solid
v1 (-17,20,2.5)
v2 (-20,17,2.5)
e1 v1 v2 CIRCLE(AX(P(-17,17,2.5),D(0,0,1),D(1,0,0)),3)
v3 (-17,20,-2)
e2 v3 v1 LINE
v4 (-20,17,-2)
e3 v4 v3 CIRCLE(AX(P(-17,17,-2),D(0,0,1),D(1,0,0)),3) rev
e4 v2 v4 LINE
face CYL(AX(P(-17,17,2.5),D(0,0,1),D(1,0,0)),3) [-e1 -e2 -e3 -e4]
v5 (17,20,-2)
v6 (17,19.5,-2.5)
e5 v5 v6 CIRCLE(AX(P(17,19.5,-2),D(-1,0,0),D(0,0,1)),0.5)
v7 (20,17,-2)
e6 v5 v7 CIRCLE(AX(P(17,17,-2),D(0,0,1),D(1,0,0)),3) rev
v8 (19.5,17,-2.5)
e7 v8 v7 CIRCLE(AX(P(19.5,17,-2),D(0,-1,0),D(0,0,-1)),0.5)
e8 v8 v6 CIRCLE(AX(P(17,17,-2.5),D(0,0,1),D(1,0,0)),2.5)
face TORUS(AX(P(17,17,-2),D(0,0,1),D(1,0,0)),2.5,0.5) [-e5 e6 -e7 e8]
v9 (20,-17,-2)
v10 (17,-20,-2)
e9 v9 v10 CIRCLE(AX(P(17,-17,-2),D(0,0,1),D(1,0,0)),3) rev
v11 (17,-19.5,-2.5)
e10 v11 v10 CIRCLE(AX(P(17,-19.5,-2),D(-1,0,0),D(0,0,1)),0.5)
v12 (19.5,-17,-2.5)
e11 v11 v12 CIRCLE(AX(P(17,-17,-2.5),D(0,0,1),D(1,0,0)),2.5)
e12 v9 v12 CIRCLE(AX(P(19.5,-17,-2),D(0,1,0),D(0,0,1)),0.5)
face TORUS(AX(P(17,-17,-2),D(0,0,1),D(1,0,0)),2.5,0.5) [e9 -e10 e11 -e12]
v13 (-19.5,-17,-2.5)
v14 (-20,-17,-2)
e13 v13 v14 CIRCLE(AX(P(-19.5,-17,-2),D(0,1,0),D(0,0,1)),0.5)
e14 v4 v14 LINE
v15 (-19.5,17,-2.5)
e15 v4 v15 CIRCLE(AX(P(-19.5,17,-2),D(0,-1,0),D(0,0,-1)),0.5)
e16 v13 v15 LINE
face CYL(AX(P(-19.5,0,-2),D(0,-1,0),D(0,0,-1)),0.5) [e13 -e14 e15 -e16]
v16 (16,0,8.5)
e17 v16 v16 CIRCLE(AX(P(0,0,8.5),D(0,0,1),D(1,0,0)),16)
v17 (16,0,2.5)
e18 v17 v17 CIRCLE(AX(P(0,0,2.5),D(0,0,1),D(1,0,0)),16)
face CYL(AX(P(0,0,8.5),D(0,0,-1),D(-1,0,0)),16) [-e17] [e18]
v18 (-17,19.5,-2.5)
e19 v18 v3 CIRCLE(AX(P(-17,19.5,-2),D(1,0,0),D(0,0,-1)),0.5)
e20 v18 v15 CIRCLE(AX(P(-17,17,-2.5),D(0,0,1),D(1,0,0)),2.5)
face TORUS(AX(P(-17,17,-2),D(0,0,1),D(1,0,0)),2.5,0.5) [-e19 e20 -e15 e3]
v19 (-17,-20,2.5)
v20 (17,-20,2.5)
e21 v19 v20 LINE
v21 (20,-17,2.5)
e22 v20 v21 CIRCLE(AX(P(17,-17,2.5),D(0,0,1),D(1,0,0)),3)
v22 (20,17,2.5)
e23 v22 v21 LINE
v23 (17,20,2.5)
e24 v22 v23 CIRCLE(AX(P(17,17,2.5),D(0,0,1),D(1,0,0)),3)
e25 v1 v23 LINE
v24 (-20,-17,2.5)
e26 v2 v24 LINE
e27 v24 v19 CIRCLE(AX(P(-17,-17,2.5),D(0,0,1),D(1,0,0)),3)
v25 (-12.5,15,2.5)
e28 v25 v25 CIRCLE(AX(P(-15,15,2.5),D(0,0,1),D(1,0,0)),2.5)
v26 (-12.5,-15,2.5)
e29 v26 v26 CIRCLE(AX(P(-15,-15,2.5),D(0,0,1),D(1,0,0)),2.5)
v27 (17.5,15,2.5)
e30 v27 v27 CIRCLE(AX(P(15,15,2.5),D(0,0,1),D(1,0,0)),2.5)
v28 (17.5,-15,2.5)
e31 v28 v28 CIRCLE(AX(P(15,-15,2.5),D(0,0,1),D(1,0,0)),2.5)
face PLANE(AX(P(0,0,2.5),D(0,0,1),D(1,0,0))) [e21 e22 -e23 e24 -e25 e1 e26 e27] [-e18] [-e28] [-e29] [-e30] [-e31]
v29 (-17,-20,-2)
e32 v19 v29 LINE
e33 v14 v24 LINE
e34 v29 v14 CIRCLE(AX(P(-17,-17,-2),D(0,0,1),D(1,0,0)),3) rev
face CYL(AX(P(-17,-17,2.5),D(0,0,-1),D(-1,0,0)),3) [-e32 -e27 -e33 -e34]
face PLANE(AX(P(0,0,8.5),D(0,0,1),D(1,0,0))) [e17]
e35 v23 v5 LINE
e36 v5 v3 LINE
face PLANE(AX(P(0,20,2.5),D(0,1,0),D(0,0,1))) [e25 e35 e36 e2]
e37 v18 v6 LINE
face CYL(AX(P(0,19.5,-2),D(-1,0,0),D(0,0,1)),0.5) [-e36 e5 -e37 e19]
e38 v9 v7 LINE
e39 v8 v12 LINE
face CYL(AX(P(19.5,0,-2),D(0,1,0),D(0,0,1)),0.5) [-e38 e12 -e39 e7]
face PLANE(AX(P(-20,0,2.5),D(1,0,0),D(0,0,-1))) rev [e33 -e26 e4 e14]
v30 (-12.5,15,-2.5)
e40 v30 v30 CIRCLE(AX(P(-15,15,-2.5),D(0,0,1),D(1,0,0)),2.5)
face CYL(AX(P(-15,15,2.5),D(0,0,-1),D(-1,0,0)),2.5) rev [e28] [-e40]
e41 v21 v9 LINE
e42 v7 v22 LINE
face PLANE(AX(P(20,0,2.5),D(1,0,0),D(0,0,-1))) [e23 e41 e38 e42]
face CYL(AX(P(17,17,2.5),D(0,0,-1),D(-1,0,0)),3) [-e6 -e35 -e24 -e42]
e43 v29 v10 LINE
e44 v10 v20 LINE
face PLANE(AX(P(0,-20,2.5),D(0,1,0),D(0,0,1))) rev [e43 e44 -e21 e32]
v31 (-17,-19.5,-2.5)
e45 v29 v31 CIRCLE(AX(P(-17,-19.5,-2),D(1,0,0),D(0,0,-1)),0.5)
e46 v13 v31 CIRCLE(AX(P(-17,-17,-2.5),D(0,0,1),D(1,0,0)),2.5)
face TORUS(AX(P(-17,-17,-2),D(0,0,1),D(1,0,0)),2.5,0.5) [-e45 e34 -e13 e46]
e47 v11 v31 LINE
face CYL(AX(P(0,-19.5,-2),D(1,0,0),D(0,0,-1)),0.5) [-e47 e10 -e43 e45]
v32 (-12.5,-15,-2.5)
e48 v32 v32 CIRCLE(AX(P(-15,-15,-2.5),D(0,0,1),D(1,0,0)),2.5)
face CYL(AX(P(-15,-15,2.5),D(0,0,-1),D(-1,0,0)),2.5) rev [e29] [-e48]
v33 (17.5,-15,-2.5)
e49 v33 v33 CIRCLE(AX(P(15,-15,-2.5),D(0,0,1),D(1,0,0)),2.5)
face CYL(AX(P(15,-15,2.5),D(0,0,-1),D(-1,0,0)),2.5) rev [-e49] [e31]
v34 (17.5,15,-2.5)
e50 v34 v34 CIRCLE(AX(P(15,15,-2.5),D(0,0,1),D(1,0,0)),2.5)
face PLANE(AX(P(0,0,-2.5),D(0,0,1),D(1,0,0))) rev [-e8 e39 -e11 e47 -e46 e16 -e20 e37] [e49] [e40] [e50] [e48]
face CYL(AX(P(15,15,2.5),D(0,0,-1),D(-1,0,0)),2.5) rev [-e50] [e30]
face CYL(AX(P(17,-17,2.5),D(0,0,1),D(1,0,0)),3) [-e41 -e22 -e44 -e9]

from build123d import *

# Parameters (mm, degrees)
SKETCH1_W           = 40
SKETCH1_H           = 40
SKETCH1_R           = 2.5
SKETCH1_R_2         = 16
BOSS_EXTRUDE1_DEPTH = 2.5
BOSS_EXTRUDE2_START = 2.5
SKETCH1_5_R         = 16
BOSS_EXTRUDE2_DEPTH = 6
FILLET1_R           = 0.5
FILLET2_R           = 3


with BuildPart() as part:
    # Sketch1 → Boss-Extrude1 (new, symmetric)
    # profile 1 of 2: a face of its own
    with BuildSketch(Plane.XY):
        Rectangle(SKETCH1_W, SKETCH1_H)
        with Locations((-15, -15)):
            Circle(SKETCH1_R, mode=Mode.SUBTRACT)
        with Locations((15, -15)):
            Circle(SKETCH1_R, mode=Mode.SUBTRACT)
        with Locations((15, 15)):
            Circle(SKETCH1_R, mode=Mode.SUBTRACT)
        with Locations((-15, 15)):
            Circle(SKETCH1_R, mode=Mode.SUBTRACT)
        Circle(SKETCH1_R_2, mode=Mode.SUBTRACT)
    # profile 2 of 2: a face of its own
    with BuildSketch(Plane.XY):
        Circle(SKETCH1_R_2)
    extrude(amount=BOSS_EXTRUDE1_DEPTH, both=True)

    # Sketch1<5> → Boss-Extrude2 (add)
    with BuildSketch(Plane.XY.offset(BOSS_EXTRUDE2_START)):
        Circle(SKETCH1_5_R)
    extrude(amount=BOSS_EXTRUDE2_DEPTH)

    # Fillet1
    fillet1_edges = [part.edges().sort_by_distance(p)[0] for p in [
        (0, -20, -2.5),
        (-20, 0, -2.5),
        (0, 20, -2.5),
        (20, 0, -2.5),
    ]]
    fillet(fillet1_edges, radius=FILLET1_R)

    # Fillet2
    # the kernel refuses this fillet: 3 mm, written as the material it takes off along each edge
    with BuildSketch(Plane(origin=(-17, 17, -2.5), x_dir=(-1, 0, 0), z_dir=(0, -1, 0))) as fillet2_piece_1:
        with BuildLine():
            CenterArc((2.5, -0.5), 0.5, 0, 90)
            Line((3, -0.5), (3, 0))
            Line((3, 0), (2.5, 0))
        make_face()
    revolve(axis=Axis((-17, 17, -2.5), (0, 0, -1)), revolution_arc=90, mode=Mode.SUBTRACT)
    with BuildSketch(Plane(origin=(-17, -17, -2.5), x_dir=(0, -1, 0), z_dir=(1, 0, 0))) as fillet2_piece_2:
        with BuildLine():
            CenterArc((2.5, -0.5), 0.5, 0, 90)
            Line((3, -0.5), (3, 0))
            Line((3, 0), (2.5, 0))
        make_face()
    revolve(axis=Axis((-17, -17, -2.5), (0, 0, -1)), revolution_arc=90, mode=Mode.SUBTRACT)
    with BuildSketch(Plane(origin=(17, 17, -2.5), x_dir=(0, 1, 0), z_dir=(-1, 0, 0))) as fillet2_piece_3:
        with BuildLine():
            CenterArc((2.5, -0.5), 0.5, 0, 90)
            Line((3, -0.5), (3, 0))
            Line((3, 0), (2.5, 0))
        make_face()
    revolve(axis=Axis((17, 17, -2.5), (0, 0, -1)), revolution_arc=90, mode=Mode.SUBTRACT)
    with BuildSketch(Plane(origin=(17, -17, -2.5), x_dir=(1, 0, 0), z_dir=(0, 1, 0))) as fillet2_piece_4:
        with BuildLine():
            CenterArc((2.5, -0.5), 0.5, 0, 90)
            Line((3, -0.5), (3, 0))
            Line((3, 0), (2.5, 0))
        make_face()
    revolve(axis=Axis((17, -17, -2.5), (0, 0, -1)), revolution_arc=90, mode=Mode.SUBTRACT)
    with BuildSketch(Plane(origin=(20, -20, 10), x_dir=(0, 1, 0), z_dir=(0, 0, -1)), Plane(origin=(-20, -20, 10), x_dir=(1, 0, 0), z_dir=(0, 0, -1)), Plane(origin=(-20, 20, -2.5), x_dir=(1, 0, 0), z_dir=(0, 0, 1)), Plane(origin=(20, 20, -2.5), x_dir=(0, -1, 0), z_dir=(0, 0, 1))) as fillet2_piece_5:
        with BuildLine():
            CenterArc((FILLET2_R, -FILLET2_R), FILLET2_R, 90, 90)
            Line((0, -FILLET2_R), (0, 0))
            Line((0, 0), (FILLET2_R, 0))
        make_face()
    extrude(amount=12.5, mode=Mode.SUBTRACT)


solid = part.part
